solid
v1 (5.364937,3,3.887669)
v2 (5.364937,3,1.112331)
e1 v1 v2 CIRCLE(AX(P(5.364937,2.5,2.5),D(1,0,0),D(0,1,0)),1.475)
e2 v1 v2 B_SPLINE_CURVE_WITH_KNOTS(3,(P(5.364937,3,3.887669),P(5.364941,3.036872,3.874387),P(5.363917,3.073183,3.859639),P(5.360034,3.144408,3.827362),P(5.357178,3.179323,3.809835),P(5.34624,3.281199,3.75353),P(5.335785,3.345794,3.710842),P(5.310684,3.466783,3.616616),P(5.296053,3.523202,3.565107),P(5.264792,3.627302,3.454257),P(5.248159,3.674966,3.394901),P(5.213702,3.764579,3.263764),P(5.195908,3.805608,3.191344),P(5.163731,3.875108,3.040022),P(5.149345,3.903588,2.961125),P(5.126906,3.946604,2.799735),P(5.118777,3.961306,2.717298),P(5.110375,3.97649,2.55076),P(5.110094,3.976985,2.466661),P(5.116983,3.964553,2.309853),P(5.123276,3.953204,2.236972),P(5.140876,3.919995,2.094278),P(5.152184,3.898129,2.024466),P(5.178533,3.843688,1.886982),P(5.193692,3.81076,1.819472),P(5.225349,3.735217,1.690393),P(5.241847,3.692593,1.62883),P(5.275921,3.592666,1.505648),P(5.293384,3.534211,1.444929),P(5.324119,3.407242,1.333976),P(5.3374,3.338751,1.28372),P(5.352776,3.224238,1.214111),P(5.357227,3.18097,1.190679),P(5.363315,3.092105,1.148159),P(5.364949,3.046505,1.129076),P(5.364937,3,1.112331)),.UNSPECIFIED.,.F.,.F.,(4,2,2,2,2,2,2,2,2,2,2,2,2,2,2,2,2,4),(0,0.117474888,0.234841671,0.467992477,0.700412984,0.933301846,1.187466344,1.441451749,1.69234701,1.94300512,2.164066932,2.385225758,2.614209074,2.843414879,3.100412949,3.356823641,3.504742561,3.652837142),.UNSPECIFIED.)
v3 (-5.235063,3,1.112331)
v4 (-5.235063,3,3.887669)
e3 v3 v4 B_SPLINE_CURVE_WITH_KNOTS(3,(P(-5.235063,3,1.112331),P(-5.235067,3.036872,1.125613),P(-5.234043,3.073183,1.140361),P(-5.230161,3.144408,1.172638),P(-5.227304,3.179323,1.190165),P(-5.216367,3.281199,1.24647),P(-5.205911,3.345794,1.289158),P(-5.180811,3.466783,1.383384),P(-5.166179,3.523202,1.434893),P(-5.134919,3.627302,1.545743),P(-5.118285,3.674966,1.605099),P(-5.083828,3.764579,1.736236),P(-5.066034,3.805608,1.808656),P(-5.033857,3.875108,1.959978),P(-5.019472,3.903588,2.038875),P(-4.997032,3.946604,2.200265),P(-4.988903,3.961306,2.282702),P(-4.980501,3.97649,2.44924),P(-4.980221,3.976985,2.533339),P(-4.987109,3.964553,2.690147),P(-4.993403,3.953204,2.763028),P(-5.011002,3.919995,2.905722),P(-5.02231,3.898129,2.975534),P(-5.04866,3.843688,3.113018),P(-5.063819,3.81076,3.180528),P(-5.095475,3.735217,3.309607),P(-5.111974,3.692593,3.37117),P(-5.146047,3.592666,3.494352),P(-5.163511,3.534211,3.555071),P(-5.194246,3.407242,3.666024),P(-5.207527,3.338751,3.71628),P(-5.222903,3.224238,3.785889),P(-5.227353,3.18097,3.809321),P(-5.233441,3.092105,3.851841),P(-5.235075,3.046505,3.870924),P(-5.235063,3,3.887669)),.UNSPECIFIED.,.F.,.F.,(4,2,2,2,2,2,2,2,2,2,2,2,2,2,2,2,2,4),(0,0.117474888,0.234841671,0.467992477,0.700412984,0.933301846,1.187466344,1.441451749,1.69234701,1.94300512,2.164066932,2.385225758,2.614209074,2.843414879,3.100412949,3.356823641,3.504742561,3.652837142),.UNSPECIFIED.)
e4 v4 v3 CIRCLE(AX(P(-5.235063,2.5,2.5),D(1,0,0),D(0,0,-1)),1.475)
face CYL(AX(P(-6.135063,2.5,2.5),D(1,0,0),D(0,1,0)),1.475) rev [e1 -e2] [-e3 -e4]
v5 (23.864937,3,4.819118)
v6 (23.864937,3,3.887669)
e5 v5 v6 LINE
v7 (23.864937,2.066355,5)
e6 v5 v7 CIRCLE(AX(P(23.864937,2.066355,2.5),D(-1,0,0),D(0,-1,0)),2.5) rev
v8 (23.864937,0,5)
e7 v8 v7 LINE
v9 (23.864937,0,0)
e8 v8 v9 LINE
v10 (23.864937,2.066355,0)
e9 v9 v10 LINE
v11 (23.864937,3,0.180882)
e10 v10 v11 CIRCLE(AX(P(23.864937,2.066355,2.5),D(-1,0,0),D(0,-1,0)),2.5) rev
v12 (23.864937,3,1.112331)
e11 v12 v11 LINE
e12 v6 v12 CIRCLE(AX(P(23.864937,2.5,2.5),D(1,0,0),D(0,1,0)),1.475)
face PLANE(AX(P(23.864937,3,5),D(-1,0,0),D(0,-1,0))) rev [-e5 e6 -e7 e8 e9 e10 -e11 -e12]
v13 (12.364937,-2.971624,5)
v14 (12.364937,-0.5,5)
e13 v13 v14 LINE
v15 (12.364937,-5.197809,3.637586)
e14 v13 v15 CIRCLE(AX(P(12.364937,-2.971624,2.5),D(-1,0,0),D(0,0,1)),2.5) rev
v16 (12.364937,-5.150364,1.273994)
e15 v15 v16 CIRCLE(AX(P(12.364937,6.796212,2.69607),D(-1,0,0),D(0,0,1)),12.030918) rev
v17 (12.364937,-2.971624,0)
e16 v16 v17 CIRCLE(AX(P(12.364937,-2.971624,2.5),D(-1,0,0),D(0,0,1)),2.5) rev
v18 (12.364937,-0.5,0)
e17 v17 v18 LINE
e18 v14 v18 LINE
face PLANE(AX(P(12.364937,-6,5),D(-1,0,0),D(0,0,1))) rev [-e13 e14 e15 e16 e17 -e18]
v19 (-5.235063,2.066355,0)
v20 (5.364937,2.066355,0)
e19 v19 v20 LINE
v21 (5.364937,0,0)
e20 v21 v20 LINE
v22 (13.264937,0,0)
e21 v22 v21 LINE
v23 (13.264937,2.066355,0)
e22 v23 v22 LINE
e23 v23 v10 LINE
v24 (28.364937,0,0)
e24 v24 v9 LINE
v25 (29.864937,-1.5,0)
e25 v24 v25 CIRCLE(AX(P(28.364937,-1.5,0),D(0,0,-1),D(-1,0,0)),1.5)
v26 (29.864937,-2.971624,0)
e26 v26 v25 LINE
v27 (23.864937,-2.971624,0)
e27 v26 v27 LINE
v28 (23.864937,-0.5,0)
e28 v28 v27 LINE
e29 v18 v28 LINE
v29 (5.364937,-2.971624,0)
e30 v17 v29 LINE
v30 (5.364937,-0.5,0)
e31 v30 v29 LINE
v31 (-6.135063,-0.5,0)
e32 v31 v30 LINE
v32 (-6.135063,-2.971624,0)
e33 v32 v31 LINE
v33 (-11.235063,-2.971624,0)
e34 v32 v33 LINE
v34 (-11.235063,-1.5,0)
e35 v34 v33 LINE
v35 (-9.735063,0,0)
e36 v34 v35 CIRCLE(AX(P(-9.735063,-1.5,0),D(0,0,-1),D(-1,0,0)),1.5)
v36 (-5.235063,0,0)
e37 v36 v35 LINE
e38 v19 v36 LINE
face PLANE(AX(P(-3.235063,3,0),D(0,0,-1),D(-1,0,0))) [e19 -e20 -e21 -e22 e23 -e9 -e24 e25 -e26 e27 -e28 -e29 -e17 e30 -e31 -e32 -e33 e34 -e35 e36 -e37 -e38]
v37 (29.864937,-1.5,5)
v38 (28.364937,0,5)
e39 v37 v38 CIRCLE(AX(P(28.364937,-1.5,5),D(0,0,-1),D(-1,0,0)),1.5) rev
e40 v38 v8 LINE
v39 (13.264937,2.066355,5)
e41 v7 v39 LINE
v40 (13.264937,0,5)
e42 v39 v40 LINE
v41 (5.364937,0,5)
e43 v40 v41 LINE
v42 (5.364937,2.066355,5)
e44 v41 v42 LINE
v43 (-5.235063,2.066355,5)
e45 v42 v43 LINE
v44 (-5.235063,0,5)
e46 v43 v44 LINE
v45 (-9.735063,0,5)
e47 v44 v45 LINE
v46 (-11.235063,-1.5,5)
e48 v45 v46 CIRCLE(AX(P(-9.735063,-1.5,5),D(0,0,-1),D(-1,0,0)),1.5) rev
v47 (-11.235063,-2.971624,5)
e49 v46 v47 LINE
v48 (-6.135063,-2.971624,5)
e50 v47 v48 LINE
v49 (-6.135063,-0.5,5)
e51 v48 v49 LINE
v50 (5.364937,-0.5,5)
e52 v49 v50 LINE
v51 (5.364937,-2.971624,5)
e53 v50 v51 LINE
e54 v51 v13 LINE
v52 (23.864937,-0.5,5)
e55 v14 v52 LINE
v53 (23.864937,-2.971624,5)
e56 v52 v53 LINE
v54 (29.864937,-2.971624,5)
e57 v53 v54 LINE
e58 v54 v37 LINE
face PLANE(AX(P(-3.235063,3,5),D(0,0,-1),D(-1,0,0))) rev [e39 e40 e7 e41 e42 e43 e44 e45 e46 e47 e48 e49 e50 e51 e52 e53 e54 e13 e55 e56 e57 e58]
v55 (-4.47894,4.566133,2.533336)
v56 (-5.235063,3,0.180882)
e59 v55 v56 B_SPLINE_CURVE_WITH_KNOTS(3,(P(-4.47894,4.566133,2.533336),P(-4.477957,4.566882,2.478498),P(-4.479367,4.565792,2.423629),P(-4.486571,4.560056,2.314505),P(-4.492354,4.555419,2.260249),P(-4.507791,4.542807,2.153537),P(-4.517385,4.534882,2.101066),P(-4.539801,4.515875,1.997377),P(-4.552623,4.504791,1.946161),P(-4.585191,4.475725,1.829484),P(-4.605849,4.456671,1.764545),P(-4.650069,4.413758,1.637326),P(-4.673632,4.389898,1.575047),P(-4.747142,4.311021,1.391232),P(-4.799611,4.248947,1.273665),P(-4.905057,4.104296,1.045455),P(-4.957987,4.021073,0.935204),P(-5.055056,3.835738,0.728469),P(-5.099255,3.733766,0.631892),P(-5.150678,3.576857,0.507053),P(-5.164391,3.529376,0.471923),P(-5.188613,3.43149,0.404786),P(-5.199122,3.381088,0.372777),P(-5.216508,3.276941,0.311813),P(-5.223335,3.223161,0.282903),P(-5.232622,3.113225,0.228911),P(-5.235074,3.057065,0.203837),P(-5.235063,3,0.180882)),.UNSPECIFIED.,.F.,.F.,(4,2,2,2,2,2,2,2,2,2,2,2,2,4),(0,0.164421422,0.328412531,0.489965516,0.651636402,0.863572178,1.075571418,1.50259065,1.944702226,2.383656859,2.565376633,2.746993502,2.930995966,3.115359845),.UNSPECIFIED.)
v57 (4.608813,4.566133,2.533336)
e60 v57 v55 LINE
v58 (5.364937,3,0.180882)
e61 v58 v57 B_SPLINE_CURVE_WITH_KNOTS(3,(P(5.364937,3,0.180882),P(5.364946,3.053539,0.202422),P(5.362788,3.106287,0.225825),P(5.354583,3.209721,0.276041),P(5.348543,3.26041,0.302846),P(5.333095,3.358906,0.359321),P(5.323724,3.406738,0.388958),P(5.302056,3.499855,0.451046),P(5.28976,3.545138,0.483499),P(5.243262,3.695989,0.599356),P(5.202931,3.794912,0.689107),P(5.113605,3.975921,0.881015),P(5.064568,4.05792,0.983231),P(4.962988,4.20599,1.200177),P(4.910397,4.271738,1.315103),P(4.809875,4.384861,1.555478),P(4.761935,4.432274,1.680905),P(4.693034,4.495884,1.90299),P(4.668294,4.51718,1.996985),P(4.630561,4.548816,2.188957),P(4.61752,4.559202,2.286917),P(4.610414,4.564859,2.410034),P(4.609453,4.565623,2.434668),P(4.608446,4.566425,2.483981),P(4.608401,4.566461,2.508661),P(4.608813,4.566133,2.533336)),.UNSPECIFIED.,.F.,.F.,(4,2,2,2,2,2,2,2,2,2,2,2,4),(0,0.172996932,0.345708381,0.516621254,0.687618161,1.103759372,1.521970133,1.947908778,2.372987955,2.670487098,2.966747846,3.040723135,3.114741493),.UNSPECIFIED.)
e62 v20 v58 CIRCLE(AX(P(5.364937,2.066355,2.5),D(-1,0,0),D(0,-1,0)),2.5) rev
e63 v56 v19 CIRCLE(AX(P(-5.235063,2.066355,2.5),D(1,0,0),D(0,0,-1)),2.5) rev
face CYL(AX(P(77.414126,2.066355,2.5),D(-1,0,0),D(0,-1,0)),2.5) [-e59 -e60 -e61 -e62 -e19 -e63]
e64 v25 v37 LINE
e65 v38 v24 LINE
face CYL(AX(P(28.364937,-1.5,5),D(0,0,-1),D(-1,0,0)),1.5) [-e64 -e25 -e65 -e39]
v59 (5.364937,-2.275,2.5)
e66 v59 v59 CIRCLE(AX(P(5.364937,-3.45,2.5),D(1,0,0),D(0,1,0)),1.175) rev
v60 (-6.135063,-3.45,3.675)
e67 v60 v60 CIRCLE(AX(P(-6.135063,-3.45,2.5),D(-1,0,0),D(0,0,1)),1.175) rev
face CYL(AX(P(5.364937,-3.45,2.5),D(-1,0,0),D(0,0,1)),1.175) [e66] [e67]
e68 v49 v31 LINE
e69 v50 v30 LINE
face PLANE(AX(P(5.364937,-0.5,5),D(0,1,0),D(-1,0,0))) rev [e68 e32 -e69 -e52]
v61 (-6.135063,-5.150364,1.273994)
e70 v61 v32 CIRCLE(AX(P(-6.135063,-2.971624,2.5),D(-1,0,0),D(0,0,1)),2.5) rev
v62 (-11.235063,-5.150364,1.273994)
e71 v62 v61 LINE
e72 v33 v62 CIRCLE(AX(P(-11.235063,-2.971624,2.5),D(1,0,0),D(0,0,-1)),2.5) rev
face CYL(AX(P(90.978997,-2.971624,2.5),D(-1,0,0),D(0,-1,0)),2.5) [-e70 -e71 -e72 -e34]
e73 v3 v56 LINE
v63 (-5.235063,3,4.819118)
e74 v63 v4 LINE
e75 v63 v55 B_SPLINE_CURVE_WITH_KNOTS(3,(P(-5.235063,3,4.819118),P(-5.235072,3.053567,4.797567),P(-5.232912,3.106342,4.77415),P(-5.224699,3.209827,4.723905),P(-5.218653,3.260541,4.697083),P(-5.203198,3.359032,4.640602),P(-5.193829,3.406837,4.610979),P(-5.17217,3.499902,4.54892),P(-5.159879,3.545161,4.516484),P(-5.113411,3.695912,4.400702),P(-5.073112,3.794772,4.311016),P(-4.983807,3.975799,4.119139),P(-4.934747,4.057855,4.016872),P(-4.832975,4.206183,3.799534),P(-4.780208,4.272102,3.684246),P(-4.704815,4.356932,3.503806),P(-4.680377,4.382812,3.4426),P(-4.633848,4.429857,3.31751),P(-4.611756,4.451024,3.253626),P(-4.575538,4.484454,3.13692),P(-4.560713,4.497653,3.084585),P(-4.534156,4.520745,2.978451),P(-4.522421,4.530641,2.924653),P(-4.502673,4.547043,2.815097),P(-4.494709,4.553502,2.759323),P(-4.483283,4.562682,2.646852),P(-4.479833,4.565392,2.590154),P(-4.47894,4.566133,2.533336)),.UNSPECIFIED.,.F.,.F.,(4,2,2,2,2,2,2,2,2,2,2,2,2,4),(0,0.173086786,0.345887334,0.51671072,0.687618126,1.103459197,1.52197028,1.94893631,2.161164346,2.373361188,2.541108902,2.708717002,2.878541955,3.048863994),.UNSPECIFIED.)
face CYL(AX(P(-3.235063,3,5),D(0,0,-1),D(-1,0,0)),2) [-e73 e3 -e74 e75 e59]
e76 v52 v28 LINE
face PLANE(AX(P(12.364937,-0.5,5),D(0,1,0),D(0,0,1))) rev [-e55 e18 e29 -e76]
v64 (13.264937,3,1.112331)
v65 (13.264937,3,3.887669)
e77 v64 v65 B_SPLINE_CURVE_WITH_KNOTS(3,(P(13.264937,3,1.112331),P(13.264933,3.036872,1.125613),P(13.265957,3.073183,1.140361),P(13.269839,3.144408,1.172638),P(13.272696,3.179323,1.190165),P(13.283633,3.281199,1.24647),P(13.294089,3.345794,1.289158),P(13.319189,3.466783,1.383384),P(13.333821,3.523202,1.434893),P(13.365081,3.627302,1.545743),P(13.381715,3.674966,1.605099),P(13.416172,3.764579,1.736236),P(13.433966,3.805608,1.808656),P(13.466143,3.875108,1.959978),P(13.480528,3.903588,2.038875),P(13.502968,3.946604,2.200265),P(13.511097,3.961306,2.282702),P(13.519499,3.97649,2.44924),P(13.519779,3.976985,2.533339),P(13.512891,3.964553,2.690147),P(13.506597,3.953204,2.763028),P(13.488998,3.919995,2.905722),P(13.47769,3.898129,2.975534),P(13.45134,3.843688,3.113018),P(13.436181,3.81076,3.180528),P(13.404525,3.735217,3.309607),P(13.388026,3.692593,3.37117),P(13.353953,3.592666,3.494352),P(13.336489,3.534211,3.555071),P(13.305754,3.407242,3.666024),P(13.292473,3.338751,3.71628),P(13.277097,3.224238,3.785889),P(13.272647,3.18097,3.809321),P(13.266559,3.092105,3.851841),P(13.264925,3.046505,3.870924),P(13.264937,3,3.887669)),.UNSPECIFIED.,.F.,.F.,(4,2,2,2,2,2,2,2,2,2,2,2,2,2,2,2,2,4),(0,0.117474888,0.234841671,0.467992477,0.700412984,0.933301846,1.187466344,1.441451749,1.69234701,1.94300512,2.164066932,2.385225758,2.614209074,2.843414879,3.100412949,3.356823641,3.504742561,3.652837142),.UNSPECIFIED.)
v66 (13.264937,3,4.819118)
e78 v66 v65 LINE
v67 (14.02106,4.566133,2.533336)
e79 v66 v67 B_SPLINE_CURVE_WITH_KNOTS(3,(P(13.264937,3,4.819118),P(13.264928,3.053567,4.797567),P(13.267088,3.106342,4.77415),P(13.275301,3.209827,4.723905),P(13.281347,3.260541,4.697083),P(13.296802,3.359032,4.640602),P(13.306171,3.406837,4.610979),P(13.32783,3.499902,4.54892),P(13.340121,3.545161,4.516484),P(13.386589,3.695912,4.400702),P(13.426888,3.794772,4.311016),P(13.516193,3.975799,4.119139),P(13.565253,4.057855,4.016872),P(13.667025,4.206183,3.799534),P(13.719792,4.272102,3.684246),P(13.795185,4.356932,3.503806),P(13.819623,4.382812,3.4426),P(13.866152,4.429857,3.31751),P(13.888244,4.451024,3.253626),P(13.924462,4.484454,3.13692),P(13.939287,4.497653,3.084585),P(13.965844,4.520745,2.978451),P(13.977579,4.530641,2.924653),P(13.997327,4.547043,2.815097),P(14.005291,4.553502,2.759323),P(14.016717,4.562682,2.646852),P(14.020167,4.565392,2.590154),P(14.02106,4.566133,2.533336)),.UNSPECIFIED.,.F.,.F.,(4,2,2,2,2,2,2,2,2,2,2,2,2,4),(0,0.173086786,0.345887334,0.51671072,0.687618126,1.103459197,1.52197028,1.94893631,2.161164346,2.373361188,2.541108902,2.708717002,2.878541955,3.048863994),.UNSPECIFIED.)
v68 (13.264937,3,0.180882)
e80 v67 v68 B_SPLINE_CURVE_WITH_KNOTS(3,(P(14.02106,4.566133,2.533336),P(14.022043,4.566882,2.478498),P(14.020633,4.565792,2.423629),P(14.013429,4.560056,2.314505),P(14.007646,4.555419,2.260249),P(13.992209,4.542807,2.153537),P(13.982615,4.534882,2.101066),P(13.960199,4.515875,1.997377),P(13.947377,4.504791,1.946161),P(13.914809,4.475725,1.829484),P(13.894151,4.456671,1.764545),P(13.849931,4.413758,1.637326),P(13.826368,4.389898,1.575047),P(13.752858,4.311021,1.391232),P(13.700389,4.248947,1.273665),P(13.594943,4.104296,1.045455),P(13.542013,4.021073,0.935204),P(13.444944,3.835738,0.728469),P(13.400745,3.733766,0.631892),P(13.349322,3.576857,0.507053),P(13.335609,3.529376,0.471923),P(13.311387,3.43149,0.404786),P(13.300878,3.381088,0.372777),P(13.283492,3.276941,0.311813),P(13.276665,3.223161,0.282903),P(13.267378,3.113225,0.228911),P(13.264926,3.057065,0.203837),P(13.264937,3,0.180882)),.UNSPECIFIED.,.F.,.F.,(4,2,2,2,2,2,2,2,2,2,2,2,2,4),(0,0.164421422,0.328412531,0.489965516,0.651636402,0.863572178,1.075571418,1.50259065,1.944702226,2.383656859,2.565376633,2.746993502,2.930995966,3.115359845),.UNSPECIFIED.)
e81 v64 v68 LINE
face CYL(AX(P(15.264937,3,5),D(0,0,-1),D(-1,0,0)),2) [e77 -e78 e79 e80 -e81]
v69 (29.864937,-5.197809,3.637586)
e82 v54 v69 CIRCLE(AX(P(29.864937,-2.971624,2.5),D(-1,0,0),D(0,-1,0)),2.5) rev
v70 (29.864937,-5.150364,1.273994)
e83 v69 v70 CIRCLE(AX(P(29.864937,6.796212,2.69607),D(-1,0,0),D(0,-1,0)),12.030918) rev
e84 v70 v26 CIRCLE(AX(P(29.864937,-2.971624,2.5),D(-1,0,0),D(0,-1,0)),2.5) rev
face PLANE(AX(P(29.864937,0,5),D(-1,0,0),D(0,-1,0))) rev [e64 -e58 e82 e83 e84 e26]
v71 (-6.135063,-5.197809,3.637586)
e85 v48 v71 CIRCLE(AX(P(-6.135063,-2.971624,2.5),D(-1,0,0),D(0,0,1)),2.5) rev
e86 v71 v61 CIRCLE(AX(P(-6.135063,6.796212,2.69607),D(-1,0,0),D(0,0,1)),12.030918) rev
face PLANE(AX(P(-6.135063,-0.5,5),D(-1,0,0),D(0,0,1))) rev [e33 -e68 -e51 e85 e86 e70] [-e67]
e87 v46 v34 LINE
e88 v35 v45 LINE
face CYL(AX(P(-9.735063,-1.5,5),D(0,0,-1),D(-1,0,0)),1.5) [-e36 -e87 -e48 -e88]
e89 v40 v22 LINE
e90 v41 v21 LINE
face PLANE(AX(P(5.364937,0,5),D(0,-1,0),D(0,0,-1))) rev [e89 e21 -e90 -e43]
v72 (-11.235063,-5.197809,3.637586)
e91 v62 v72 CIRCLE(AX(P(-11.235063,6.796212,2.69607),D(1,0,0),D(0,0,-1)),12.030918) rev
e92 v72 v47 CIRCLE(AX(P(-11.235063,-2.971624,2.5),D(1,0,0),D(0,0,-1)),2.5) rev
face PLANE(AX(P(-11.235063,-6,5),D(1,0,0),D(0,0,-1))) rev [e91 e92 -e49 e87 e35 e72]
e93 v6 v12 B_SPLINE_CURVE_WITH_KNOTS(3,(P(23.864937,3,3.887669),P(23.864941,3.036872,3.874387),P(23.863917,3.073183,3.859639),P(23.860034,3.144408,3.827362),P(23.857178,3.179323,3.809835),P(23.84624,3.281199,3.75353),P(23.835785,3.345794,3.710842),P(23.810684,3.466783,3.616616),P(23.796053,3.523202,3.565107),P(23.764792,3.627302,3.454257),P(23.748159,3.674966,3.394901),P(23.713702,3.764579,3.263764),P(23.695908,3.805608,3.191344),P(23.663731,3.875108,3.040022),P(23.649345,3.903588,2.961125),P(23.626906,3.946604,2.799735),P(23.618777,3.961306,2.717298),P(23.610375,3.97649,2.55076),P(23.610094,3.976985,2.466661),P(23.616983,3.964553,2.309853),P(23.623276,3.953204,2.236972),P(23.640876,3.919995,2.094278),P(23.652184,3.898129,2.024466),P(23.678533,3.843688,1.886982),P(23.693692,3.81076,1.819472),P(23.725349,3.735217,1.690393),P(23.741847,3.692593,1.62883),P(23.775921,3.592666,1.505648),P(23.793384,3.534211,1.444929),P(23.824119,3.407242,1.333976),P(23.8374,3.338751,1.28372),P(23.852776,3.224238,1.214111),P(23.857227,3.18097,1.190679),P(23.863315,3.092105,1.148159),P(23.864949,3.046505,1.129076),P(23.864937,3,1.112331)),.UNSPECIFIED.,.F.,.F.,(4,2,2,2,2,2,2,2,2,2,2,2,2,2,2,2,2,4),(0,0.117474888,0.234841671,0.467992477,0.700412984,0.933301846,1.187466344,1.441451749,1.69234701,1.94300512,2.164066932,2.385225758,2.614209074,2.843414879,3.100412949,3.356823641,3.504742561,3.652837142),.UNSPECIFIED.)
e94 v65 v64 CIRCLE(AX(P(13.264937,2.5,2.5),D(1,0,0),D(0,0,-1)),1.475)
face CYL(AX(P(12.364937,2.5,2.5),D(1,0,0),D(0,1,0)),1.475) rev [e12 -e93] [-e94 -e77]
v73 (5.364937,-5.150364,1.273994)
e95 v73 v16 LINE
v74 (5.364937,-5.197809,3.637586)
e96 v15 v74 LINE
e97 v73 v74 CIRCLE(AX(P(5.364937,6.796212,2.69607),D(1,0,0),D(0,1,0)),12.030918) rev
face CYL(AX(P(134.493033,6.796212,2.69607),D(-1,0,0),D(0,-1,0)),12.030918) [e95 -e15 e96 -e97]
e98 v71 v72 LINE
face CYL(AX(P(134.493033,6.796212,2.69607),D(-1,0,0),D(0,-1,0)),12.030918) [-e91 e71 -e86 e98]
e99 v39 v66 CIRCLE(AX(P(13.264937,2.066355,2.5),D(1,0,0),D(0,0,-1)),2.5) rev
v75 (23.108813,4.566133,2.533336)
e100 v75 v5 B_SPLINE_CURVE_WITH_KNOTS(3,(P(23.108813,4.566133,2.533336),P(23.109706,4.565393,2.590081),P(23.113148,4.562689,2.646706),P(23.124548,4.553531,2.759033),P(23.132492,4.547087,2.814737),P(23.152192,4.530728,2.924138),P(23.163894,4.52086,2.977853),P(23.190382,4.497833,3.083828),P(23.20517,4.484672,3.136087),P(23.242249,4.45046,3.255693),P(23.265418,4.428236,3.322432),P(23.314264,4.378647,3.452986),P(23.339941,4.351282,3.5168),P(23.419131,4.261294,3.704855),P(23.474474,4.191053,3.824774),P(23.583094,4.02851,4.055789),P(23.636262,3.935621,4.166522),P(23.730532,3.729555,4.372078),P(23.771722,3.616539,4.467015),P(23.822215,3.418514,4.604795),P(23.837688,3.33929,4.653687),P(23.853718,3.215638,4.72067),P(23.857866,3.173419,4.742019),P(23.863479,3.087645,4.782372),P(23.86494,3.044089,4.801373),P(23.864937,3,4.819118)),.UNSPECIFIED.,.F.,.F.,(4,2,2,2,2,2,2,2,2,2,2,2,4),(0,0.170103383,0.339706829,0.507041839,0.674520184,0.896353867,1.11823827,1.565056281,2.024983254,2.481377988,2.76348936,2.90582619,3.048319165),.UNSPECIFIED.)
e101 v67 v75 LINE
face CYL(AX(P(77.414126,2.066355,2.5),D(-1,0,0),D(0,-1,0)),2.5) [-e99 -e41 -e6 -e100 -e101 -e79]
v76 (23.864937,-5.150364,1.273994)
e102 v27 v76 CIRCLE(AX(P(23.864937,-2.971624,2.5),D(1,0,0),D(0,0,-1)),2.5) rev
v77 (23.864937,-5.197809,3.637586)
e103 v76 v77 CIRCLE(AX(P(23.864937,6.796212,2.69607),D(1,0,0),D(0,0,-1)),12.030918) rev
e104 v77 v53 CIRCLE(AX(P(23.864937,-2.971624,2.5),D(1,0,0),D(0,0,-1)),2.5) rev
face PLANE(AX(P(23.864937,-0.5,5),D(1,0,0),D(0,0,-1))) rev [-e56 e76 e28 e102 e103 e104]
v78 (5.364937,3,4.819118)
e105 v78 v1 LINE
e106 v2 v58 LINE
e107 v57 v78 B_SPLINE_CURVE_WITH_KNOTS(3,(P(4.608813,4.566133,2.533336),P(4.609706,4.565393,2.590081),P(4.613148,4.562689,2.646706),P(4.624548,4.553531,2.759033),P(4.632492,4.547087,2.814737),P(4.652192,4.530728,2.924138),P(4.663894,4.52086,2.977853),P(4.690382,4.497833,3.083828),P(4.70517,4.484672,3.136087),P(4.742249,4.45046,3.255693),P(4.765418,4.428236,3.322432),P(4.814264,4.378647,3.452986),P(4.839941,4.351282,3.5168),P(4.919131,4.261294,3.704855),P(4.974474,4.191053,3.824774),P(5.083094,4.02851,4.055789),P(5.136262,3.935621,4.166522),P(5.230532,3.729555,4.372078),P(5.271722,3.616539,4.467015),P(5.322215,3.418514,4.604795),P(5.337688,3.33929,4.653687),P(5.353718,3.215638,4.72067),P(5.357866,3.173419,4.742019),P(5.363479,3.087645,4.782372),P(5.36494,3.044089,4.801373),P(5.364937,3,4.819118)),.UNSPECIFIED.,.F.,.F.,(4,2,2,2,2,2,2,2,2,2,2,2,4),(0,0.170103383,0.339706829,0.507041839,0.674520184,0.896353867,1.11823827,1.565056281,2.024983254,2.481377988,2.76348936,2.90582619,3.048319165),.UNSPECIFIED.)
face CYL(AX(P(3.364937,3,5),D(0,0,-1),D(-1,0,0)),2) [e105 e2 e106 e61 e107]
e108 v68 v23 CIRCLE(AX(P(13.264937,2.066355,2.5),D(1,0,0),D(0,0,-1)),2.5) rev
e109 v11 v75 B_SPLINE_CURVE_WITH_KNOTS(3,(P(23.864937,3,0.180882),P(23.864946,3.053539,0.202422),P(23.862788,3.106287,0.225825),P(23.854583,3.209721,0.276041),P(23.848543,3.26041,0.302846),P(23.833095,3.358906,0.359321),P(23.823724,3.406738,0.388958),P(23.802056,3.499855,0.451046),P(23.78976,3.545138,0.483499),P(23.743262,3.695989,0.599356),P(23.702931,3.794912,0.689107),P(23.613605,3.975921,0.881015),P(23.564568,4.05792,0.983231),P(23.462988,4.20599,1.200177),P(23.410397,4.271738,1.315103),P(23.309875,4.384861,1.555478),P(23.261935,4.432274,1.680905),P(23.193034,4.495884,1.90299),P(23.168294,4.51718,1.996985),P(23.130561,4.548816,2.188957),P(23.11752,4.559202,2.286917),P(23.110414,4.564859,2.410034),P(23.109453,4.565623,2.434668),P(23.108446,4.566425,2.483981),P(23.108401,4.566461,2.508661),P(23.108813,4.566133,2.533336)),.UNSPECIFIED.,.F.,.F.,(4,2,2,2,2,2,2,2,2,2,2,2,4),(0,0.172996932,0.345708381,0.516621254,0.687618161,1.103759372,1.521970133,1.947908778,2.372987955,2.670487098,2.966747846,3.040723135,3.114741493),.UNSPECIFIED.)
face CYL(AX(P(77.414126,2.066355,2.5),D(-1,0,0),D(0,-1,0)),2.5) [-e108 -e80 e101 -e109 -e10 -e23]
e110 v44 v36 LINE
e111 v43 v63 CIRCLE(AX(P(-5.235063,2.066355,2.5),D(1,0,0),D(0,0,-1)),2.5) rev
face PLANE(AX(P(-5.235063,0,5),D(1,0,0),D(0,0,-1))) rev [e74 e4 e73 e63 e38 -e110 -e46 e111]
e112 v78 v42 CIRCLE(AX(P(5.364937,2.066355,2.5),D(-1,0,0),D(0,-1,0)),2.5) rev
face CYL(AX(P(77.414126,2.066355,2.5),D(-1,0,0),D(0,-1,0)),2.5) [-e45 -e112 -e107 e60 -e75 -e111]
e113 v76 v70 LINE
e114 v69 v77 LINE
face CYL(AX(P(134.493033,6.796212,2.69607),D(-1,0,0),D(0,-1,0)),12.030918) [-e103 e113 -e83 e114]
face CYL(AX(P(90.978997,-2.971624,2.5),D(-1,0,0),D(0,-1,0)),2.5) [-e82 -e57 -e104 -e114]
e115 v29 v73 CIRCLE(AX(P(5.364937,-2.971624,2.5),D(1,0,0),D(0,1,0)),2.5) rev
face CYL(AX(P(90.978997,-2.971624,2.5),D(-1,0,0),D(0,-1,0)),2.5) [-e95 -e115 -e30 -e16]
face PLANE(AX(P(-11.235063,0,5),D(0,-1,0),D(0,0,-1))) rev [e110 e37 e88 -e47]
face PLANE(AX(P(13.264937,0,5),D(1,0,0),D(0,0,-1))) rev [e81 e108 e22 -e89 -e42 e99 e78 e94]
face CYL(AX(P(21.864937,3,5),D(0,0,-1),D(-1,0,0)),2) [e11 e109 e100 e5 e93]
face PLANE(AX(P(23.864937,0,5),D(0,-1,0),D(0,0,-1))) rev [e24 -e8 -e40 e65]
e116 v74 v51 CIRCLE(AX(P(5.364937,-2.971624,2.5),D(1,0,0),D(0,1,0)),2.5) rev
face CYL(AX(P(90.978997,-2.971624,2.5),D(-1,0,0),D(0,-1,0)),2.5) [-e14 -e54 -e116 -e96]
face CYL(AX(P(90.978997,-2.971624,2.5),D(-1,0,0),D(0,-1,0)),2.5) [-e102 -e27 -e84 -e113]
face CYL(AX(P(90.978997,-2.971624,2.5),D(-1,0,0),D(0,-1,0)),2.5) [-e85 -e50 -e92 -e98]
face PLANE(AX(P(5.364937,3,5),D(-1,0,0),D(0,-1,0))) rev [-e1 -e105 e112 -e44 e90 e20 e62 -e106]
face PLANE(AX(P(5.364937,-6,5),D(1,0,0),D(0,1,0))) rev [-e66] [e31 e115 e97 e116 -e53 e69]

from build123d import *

# Parameters (mm, degrees)
SALIENTE_EXTRUIR1_DEPTH     = 5
CROQUIS22_R                 = 1.475
CORTAR_EXTRUIR19_DEPTH      = 11.5
CROQUIS23_R                 = 1.475
CORTAR_EXTRUIR20_DEPTH      = 11.5
CORTAR_EXTRUIR21_DEPTH      = 36.958448256
CORTAR_EXTRUIR21_DEPTH_BACK = 36.958448256
CORTAR_EXTRUIR23_DEPTH      = 42.835511243
CORTAR_EXTRUIR23_DEPTH_BACK = 42.835511243
REDONDEO10_R                = 2.5
REDONDEO6_R                 = 1.5
CORTAR_EXTRUIR18_DEPTH      = 42.763006005
CORTAR_EXTRUIR18_DEPTH_BACK = 42.763006005
CROQUIS26_R                 = 1.175
SALIENTE_EXTRUIR2_DEPTH     = 11.5


with BuildPart() as part:
    # Croquis1 → Saliente-Extruir1 (new body)
    with BuildSketch(Plane.XY):
        with BuildLine():
            Line((-11.235063244, 0), (-5.235063244, 0))
            Line((-5.235063244, 0), (-5.235063244, 3))
            ThreePointArc((-5.235063244, 3), (-4.649276807, 4.414213562), (-3.235063244, 5))
            Line((-3.235063244, 5), (3.364936756, 5))
            ThreePointArc((3.364936756, 5), (4.779150318, 4.414213562), (5.364936756, 3))
            Line((5.364936756, 3), (5.364936756, 0))
            Line((5.364936756, 0), (13.264936756, 0))
            Line((13.264936756, 0), (13.264936756, 3))
            ThreePointArc((13.264936756, 3), (13.850723193, 4.414213562), (15.264936756, 5))
            Line((15.264936756, 5), (21.864936756, 5))
            ThreePointArc((21.864936756, 5), (23.279150318, 4.414213562), (23.864936756, 3))
            Line((23.864936756, 3), (23.864936756, 0))
            Line((23.864936756, 0), (29.864936756, 0))
            Line((29.864936756, 0), (29.864936756, -6))
            Line((29.864936756, -6), (23.864936756, -6))
            Line((23.864936756, -6), (23.864936756, -0.5))
            Line((23.864936756, -0.5), (12.364936756, -0.5))
            Line((12.364936756, -0.5), (12.364936756, -6))
            Line((12.364936756, -6), (5.364936756, -6))
            Line((5.364936756, -6), (5.364936756, -0.5))
            Line((5.364936756, -0.5), (-6.135063244, -0.5))
            Line((-6.135063244, -0.5), (-6.135063244, -6))
            Line((-6.135063244, -6), (-11.235063244, -6))
            Line((-11.235063244, -6), (-11.235063244, 0))
        make_face()
    extrude(amount=SALIENTE_EXTRUIR1_DEPTH)

    # Croquis22 → Cortar-Extruir19 (cut)
    with BuildSketch(Plane(origin=(5.364936756, 0, 0), x_dir=(0, 0, -1), z_dir=(1, 0, 0))):
        with Locations(Location((-2.5, 2.5, 0), (0, 0, 160.185071851))):
            Circle(CROQUIS22_R)
    extrude(amount=-CORTAR_EXTRUIR19_DEPTH, mode=Mode.SUBTRACT)

    # Croquis23 → Cortar-Extruir20 (cut)
    with BuildSketch(Plane(origin=(23.864936756, 0, 0), x_dir=(0, 0, -1), z_dir=(1, 0, 0))):
        with Locations(Location((-2.5, 2.5, 0), (0, 0, 160.185071851))):
            Circle(CROQUIS23_R)
    extrude(amount=-CORTAR_EXTRUIR20_DEPTH, mode=Mode.SUBTRACT)

    # Croquis24 → Cortar-Extruir21 (cut, two sides: drawn at the far end of the back side and taken through both)
    with BuildSketch(Plane(origin=(23.864936756, 0, 0), x_dir=(0, 0, -1), z_dir=(1, 0, 0)).offset(-CORTAR_EXTRUIR21_DEPTH_BACK)):
        with BuildLine():
            Line((-28.080519184, -19.184110571), (-5.642479376, 3.253929236))
            ThreePointArc((-5.642479376, 3.253929236), (-2.473578072, 4.566531134), (0.695323231, 3.253929236))
            Line((0.695323231, 3.253929236), (23.133363039, -19.184110571))
            Line((23.133363039, -19.184110571), (23.133363039, 44.280249847))
            Line((23.133363039, 44.280249847), (-28.080519184, 44.280249847))
            Line((-28.080519184, 44.280249847), (-28.080519184, -19.184110571))
        make_face()
    extrude(amount=CORTAR_EXTRUIR21_DEPTH + CORTAR_EXTRUIR21_DEPTH_BACK, mode=Mode.SUBTRACT)

    # Croquis28 → Cortar-Extruir23 (cut, two sides: drawn at the far end of the back side and taken through both)
    with BuildSketch(Plane(origin=(29.864936756, 0, 0), x_dir=(0, 0, -1), z_dir=(1, 0, 0)).offset(-CORTAR_EXTRUIR23_DEPTH_BACK)):
        with BuildLine():
            Line((-36.053555434, 5.476255779), (-5.598630977, -4.9471511))
            ThreePointArc((-5.598630977, -4.9471511), (-2.445331468, -5.471830492), (0.70796804, -4.9471511))
            Line((0.70796804, -4.9471511), (31.162892497, 5.476255779))
            Line((31.162892497, 5.476255779), (31.162892497, -58.902306946))
            Line((31.162892497, -58.902306946), (-36.053555434, -58.902306946))
            Line((-36.053555434, -58.902306946), (-36.053555434, 5.476255779))
        make_face()
    extrude(amount=CORTAR_EXTRUIR23_DEPTH + CORTAR_EXTRUIR23_DEPTH_BACK, mode=Mode.SUBTRACT)

    # Redondeo10
    # the kernel refuses this fillet: 2.5 mm, written as the material it takes off along each edge
    with BuildSketch(Plane(origin=(0.125968827, -5.13075911, 5), x_dir=(0, 1, 0), z_dir=(-1, 0, 0))) as redondeo10_piece_1:
        with BuildLine():
            CenterArc((2.159135079, 2.5), REDONDEO10_R, 180.432762449, 89.567237551)
            ThreePointArc((-0.340793609, 2.481117356), (-0.250491358, 1.229557299), (0, 0))
            Line((0, 0), (2.159135079, 0))
        make_face()
    extrude(amount=17.622064143, mode=Mode.SUBTRACT)
    with BuildSketch(Plane(origin=(0.210189755, -5.159802942, 0), x_dir=(0, 1, 0), z_dir=(-1, 0, 0))) as redondeo10_piece_2:
        with BuildLine():
            CenterArc((2.188178911, -2.5), REDONDEO10_R, 90, 90.432762449)
            ThreePointArc((-0.311749778, -2.518882644), (-0.238291712, -1.249240995), (0, 0))
            Line((0, 0), (2.188178911, 0))
        make_face()
    extrude(amount=17.790505999, mode=Mode.SUBTRACT)
    with BuildSketch(Plane(origin=(18.625968827, -5.13075911, 5), x_dir=(0, 1, 0), z_dir=(-1, 0, 0))) as redondeo10_piece_3:
        with BuildLine():
            CenterArc((2.159135079, 2.5), REDONDEO10_R, 180.432762449, 89.567237551)
            ThreePointArc((-0.340793609, 2.481117356), (-0.250491358, 1.229557299), (0, 0))
            Line((0, 0), (2.159135079, 0))
        make_face()
    extrude(amount=19.522064143, mode=Mode.SUBTRACT)
    with BuildSketch(Plane(origin=(18.710189755, -5.159802942, 0), x_dir=(0, 1, 0), z_dir=(-1, 0, 0))) as redondeo10_piece_4:
        with BuildLine():
            CenterArc((2.188178911, -2.5), REDONDEO10_R, 90, 90.432762449)
            ThreePointArc((-0.311749778, -2.518882644), (-0.238291712, -1.249240995), (0, 0))
            Line((0, 0), (2.188178911, 0))
        make_face()
    extrude(amount=19.690505999, mode=Mode.SUBTRACT)
    with BuildSketch(Plane(origin=(36.210189755, -5.159802942, 0), x_dir=(0, 1, 0), z_dir=(-1, 0, 0))) as redondeo10_piece_5:
        with BuildLine():
            CenterArc((2.188178911, -2.5), REDONDEO10_R, 90, 90.432762449)
            ThreePointArc((-0.311749778, -2.518882644), (-0.238291712, -1.249240995), (0, 0))
            Line((0, 0), (2.188178911, 0))
        make_face()
    extrude(amount=18.690505999, mode=Mode.SUBTRACT)
    with BuildSketch(Plane(origin=(36.125968827, -5.13075911, 5), x_dir=(0, 1, 0), z_dir=(-1, 0, 0))) as redondeo10_piece_6:
        with BuildLine():
            CenterArc((2.159135079, 2.5), REDONDEO10_R, 180.432762449, 89.567237551)
            ThreePointArc((-0.340793609, 2.481117356), (-0.250491358, 1.229557299), (0, 0))
            Line((0, 0), (2.159135079, 0))
        make_face()
    extrude(amount=18.522064143, mode=Mode.SUBTRACT)
    with BuildSketch(Plane(origin=(11.671123792, 3.786522656, 5), x_dir=(0, -1, 0), z_dir=(-1, 0, 0)), Plane(origin=(30.171123792, 3.786522656, 5), x_dir=(0, -1, 0), z_dir=(-1, 0, 0))) as redondeo10_piece_7:
        with BuildLine():
            CenterArc((1.720167689, -2.5), REDONDEO10_R, 90, 89.235979123)
            ThreePointArc((-0.779610048, -2.466664288), (-0.57165889, -1.175855696), (0, 0))
            Line((0, 0), (1.720167689, 0))
        make_face()
    extrude(amount=23.212374072, mode=Mode.SUBTRACT)
    with BuildSketch(Plane(origin=(11.789068224, 3.822043114, 0), x_dir=(0, -1, 0), z_dir=(-1, 0, 0)), Plane(origin=(30.289068224, 3.822043114, 0), x_dir=(0, -1, 0), z_dir=(-1, 0, 0))) as redondeo10_piece_8:
        with BuildLine():
            CenterArc((1.755688146, 2.5), REDONDEO10_R, 179.235979123, 90.764020877)
            ThreePointArc((-0.74408959, 2.533335712), (-0.562847764, 1.210625342), (0, 0))
            Line((0, 0), (1.755688146, 0))
        make_face()
    extrude(amount=23.448262936, mode=Mode.SUBTRACT)

    # Redondeo6
    redondeo6_edges = [part.edges().sort_by_distance(p)[0] for p in [
        (-11.235063244, 0, 2.5),
        (29.864936756, 0, 2.5),
    ]]
    fillet(redondeo6_edges, radius=REDONDEO6_R)

    # Croquis21 → Cortar-Extruir18 (cut, two sides: drawn at the far end of the back side and taken through both)
    with BuildSketch(Plane(origin=(29.864936756, 0, 0), x_dir=(0, 0, -1), z_dir=(1, 0, 0)).offset(-CORTAR_EXTRUIR18_DEPTH_BACK)):
        with BuildLine():
            Line((-36.990281352, 4.180822636), (-6.035224262, -4.762033155))
            ThreePointArc((-6.035224262, -4.762033155), (-2.696069768, -5.234705836), (0.643084727, -4.762033155))
            Line((0.643084727, -4.762033155), (31.598141816, 4.180822636))
            Line((31.598141816, 4.180822636), (31.598141816, -60.261096303))
            Line((31.598141816, -60.261096303), (-36.990281352, -60.261096303))
            Line((-36.990281352, -60.261096303), (-36.990281352, 4.180822636))
        make_face()
    extrude(amount=CORTAR_EXTRUIR18_DEPTH + CORTAR_EXTRUIR18_DEPTH_BACK, mode=Mode.SUBTRACT)

    # Croquis26 → Saliente-Extruir2 (add)
    with BuildSketch(Plane(origin=(-6.135063244, 0, 0), x_dir=(0, 0, -1), z_dir=(1, 0, 0))):
        with Locations(Location((-2.5, -3.45, 0), (0, 0, 180))):
            Circle(CROQUIS26_R)
    extrude(amount=SALIENTE_EXTRUIR2_DEPTH)


solid = part.part
